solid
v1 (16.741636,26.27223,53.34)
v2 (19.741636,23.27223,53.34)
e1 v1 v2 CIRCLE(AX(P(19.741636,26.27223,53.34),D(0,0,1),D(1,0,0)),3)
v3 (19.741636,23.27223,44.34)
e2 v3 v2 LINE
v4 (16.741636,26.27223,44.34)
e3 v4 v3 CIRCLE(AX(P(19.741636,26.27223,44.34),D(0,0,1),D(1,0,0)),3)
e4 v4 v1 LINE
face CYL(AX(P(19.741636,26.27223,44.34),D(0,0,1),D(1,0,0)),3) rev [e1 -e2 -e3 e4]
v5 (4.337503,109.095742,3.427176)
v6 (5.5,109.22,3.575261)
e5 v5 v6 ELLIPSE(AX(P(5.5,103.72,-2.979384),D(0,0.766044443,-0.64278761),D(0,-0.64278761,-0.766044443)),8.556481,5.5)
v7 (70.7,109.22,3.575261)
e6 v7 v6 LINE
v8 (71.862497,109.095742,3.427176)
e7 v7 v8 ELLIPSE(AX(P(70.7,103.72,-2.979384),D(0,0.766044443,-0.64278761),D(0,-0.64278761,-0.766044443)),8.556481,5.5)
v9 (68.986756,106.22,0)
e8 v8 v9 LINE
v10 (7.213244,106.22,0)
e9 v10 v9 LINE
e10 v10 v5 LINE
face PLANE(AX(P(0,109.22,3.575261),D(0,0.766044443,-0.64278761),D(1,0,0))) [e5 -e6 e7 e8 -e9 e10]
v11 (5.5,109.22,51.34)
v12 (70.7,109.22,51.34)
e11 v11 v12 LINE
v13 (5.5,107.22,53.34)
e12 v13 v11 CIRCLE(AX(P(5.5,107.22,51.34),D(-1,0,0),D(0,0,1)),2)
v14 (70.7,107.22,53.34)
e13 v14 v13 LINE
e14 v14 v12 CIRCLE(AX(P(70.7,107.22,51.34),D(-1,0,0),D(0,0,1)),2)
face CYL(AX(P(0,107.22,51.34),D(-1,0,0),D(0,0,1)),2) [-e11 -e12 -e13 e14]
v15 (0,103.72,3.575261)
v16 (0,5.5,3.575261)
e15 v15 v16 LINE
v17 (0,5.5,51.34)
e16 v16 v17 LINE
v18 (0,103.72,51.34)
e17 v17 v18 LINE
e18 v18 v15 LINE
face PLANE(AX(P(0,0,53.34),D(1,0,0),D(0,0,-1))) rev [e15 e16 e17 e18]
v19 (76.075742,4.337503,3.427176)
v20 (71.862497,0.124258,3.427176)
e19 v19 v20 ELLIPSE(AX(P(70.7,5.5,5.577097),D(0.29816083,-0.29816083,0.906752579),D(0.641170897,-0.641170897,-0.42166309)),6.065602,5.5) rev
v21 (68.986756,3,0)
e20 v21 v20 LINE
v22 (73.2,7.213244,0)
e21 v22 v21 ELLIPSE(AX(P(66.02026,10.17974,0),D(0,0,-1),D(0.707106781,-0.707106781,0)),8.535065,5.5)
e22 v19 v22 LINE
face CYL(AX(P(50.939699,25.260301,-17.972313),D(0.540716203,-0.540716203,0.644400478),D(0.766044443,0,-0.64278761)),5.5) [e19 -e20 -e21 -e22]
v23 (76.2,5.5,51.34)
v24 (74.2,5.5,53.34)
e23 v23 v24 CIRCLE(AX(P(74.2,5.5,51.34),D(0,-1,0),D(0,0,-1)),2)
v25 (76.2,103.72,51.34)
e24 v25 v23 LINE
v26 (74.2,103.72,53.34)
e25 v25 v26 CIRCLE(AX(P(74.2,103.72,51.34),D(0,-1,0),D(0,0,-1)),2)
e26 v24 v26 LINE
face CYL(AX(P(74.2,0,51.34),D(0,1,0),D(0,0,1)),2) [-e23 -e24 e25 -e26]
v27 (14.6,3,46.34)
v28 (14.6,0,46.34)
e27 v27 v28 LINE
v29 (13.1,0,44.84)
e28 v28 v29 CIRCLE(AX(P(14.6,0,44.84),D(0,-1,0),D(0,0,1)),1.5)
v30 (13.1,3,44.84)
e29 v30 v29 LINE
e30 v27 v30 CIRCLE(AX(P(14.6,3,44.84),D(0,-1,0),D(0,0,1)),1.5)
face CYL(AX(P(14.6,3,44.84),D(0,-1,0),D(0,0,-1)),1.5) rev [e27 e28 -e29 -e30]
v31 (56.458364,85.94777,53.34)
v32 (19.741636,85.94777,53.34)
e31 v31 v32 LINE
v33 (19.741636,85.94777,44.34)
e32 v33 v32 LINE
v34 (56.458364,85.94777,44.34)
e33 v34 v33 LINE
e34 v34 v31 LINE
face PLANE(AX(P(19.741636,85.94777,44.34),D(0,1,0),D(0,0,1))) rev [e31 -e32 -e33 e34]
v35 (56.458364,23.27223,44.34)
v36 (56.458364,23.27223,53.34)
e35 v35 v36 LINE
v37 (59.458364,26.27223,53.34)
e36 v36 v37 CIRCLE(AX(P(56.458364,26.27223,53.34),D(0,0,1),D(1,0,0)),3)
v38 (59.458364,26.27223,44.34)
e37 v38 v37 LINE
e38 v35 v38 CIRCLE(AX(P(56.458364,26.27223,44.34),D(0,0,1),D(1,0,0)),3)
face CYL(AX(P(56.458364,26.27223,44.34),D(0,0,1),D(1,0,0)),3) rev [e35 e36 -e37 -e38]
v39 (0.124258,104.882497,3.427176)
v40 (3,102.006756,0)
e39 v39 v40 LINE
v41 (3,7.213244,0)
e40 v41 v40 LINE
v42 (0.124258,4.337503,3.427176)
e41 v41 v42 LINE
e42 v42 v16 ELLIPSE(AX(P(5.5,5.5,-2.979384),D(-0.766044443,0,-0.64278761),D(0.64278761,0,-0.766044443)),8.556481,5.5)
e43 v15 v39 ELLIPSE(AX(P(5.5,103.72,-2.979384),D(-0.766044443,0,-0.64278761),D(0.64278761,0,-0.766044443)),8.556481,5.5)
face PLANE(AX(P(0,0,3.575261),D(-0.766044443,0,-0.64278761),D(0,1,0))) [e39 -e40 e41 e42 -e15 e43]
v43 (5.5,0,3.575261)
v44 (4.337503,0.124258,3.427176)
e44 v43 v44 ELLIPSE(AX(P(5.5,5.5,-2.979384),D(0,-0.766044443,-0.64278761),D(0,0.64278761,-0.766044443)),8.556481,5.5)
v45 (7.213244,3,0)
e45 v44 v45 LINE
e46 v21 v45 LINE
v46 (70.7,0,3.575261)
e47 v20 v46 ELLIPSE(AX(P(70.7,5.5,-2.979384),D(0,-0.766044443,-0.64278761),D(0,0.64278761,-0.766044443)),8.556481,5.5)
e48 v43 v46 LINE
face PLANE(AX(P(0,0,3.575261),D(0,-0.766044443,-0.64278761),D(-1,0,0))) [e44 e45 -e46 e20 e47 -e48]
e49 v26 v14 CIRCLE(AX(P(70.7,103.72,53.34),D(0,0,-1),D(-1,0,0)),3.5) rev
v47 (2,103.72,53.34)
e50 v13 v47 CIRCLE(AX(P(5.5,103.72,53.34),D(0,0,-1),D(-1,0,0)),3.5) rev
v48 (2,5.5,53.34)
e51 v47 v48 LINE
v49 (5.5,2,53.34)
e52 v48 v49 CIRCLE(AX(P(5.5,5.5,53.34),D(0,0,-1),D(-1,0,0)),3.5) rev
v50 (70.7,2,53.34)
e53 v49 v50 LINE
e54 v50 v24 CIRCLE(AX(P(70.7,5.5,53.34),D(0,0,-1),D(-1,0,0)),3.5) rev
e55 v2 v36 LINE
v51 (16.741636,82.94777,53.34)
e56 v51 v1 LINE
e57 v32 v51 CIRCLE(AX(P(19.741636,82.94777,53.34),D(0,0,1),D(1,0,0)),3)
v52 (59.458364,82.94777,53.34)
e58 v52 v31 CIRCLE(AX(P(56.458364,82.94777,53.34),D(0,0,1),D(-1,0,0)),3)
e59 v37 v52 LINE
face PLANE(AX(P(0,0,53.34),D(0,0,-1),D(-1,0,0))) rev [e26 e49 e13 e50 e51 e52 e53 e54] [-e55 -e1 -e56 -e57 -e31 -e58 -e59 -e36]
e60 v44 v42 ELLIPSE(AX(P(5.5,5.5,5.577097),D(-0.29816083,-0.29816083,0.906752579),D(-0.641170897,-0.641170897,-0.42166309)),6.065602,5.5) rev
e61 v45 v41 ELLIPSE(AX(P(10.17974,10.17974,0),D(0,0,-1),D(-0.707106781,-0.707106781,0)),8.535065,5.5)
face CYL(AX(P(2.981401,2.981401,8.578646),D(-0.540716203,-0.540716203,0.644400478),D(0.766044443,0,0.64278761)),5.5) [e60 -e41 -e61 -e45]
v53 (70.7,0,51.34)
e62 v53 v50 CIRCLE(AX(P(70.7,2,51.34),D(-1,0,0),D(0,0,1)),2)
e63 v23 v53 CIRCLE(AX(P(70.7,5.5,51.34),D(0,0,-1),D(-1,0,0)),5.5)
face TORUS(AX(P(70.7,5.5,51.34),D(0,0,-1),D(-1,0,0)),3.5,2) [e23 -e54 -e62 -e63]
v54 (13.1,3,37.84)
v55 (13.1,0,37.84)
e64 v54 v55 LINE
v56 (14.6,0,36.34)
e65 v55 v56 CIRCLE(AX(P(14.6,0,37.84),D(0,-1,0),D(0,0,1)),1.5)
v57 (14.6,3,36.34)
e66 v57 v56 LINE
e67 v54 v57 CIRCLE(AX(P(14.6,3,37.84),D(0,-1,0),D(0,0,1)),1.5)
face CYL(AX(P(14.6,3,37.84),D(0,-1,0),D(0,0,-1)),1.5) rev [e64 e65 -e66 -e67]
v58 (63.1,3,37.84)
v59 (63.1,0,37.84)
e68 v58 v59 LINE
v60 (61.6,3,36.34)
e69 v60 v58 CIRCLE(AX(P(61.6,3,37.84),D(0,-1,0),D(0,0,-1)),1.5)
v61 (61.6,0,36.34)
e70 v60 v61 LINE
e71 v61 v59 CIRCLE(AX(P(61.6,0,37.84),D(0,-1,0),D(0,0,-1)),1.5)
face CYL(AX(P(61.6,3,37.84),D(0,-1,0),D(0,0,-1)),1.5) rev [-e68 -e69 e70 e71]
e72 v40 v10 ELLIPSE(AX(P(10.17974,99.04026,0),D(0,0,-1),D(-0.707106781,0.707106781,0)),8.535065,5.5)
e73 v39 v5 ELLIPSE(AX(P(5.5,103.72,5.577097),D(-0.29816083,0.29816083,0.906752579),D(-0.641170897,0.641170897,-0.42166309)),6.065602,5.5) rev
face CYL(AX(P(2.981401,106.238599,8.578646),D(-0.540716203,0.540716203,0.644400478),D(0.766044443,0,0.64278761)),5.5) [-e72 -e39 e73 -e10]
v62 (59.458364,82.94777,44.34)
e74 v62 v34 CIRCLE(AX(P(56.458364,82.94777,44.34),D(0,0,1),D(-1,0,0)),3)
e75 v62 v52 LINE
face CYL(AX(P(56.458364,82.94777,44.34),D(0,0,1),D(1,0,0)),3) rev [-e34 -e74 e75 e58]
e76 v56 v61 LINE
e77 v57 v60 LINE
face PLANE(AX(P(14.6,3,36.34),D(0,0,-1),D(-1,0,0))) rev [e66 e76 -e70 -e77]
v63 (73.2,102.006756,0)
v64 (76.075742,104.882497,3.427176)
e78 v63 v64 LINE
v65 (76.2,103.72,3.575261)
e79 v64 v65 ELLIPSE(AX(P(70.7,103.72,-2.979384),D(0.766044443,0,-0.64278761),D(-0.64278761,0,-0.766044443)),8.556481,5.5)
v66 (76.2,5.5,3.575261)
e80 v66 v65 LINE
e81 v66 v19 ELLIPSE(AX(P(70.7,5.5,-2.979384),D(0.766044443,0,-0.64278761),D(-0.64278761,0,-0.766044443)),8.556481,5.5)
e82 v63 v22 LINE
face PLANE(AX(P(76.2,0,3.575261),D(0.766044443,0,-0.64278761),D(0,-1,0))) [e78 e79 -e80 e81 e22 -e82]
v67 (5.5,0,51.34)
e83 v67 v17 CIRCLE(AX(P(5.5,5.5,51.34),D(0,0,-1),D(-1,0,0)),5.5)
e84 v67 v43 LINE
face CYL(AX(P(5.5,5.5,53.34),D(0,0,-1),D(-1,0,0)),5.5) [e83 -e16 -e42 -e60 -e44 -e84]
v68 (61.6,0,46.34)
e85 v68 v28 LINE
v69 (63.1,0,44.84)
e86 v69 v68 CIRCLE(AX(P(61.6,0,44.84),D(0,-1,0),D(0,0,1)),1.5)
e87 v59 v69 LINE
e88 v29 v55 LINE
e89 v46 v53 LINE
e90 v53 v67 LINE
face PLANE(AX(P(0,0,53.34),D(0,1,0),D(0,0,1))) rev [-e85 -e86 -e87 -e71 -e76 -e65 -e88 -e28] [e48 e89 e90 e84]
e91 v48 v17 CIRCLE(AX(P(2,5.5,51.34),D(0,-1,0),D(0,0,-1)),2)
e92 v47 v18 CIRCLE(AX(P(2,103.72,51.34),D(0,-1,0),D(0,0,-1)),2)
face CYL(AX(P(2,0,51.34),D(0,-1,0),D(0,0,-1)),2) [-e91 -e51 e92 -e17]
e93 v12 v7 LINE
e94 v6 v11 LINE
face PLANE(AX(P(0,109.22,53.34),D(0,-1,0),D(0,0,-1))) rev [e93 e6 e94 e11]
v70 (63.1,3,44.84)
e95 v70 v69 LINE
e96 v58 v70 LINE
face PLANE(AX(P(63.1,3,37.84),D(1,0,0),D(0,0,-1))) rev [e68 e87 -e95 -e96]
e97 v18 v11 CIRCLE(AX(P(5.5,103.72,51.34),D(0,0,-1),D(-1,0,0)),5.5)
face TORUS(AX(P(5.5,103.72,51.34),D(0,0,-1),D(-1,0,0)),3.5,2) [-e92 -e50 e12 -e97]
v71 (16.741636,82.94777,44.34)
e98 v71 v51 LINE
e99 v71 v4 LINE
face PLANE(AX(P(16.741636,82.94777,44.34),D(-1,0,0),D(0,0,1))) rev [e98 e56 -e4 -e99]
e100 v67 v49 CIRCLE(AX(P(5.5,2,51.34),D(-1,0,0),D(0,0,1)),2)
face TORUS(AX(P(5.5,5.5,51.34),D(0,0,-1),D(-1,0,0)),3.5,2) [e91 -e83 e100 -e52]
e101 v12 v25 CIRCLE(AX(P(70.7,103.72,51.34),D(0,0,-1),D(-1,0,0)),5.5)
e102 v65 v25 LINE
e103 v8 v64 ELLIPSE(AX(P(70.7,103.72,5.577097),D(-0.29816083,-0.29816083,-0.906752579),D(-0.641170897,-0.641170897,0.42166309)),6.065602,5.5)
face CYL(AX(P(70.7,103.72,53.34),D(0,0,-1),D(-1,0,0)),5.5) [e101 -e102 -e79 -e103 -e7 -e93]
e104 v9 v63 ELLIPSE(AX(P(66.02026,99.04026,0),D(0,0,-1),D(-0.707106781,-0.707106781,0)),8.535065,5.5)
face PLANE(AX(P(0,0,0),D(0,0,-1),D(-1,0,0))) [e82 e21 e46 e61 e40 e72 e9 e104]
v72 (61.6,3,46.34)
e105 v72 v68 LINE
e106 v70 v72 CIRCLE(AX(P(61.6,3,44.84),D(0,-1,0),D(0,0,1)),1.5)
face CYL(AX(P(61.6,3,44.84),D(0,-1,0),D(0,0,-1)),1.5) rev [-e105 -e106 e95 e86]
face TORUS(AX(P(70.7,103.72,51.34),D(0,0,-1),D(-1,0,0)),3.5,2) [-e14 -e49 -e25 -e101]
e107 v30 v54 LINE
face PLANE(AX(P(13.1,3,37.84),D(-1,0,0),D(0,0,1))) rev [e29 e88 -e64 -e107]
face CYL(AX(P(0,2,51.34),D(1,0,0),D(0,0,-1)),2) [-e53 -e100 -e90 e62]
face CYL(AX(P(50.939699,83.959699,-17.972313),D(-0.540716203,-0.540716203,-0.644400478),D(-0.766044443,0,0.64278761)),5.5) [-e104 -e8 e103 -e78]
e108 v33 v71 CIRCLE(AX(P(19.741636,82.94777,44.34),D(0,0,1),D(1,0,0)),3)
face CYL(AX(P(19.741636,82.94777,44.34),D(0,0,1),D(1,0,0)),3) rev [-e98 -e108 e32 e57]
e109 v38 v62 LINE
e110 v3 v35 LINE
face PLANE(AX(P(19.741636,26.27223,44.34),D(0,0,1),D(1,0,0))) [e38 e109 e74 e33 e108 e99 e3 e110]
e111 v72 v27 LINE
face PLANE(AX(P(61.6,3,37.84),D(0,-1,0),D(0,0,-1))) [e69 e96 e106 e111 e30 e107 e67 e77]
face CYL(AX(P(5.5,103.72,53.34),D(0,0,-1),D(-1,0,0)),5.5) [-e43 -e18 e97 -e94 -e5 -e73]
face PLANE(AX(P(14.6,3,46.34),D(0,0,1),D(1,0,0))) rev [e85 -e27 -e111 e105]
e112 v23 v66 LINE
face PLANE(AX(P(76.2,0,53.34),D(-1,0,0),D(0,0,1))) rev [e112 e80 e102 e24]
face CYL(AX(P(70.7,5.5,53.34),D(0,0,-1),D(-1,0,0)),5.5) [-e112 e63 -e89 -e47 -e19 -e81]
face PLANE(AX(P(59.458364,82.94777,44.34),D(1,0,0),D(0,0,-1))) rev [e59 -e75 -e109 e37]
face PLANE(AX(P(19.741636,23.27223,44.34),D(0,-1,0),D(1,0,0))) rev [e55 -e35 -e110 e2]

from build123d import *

# Parameters (mm, degrees)
SKETCH2_W           = 76.2
SKETCH2_H           = 109.22
BOSS_EXTRUDE1_DEPTH = 53.34
CHAMFER1_SIZE       = 3
CHAMFER1_SIZE2      = 3.575260778
CHAMFER2_SIZE       = 3
CHAMFER2_SIZE2      = 3.575260778
FILLET2_R           = 5.5
FILLET3_R           = 5.5
FILLET4_R           = 2
CUT_EXTRUDE1_DEPTH  = 9
CUT_EXTRUDE2_DEPTH  = 3


with BuildPart() as part:
    # Sketch2 → Boss-Extrude1 (new body)
    with BuildSketch(Plane.XY):
        with Locations((38.1, 54.61)):
            Rectangle(SKETCH2_W, SKETCH2_H)
    extrude(amount=BOSS_EXTRUDE1_DEPTH)

    # Chamfer1
    chamfer1_edges = [part.edges().sort_by_distance(p)[0] for p in [
        (38.1, 109.22, 0),
    ]]
    chamfer1_side = [part.faces().sort_by_distance(p)[0] for p in [
        (38.1, 54.61, 0),
    ]]
    chamfer(chamfer1_edges, length=CHAMFER1_SIZE, length2=CHAMFER1_SIZE2, reference=chamfer1_side[0])

    # Chamfer2
    chamfer2_edges = [part.edges().sort_by_distance(p)[0] for p in [
        (0, 53.11, 0),
        (38.1, 0, 0),
        (76.2, 53.11, 0),
    ]]
    chamfer2_side = [part.faces().sort_by_distance(p)[0] for p in [
        (38.1, 53.11, 0),
    ]]
    chamfer(chamfer2_edges, length=CHAMFER2_SIZE, length2=CHAMFER2_SIZE2, reference=chamfer2_side[0])

    # Fillet2
    fillet2_edges = [part.edges().sort_by_distance(p)[0] for p in [
        (74.7, 107.72, 1.787630389),
        (1.5, 107.72, 1.787630389),
        (74.7, 1.5, 1.787630389),
        (1.5, 1.5, 1.787630389),
    ]]
    fillet(fillet2_edges, radius=FILLET2_R)

    # Fillet3
    fillet3_edges = [part.edges().sort_by_distance(p)[0] for p in [
        (76.2, 0, 29.139633853),
        (0, 0, 29.139633853),
        (0, 109.22, 29.139633853),
        (76.2, 109.22, 29.139633853),
    ]]
    fillet(fillet3_edges, radius=FILLET3_R - 0.0001)  # a hair under: the kernel refuses the full size

    # Fillet4
    fillet4_edges = [part.edges().sort_by_distance(p)[0] for p in [
        (76.2, 54.61, 53.34),
        (38.1, 0, 53.34),
        (0, 54.61, 53.34),
        (38.1, 109.22, 53.34),
        (74.589116586, 107.609116586, 53.34),
        (1.610883414, 107.609116586, 53.34),
        (1.610883414, 1.610883414, 53.34),
        (74.589116586, 1.610883414, 53.34),
    ]]
    fillet(fillet4_edges, radius=FILLET4_R)

    # Sketch4 → Cut-Extrude1 (cut)
    with BuildSketch(Plane.XY.offset(53.34)):
        with BuildLine():
            Line((19.741636299, 85.947770103), (56.458363701, 85.947770103))
            ThreePointArc((56.458363701, 85.947770103), (58.579684045, 85.069090446), (59.458363701, 82.947770103))
            Line((59.458363701, 82.947770103), (59.458363701, 26.272229897))
            ThreePointArc((59.458363701, 26.272229897), (58.579684045, 24.150909554), (56.458363701, 23.272229897))
            Line((56.458363701, 23.272229897), (19.741636299, 23.272229897))
            ThreePointArc((19.741636299, 23.272229897), (17.620315955, 24.150909554), (16.741636299, 26.272229897))
            Line((16.741636299, 26.272229897), (16.741636299, 82.947770103))
            ThreePointArc((16.741636299, 82.947770103), (17.620315955, 85.069090446), (19.741636299, 85.947770103))
        make_face()
    extrude(amount=-CUT_EXTRUDE1_DEPTH, mode=Mode.SUBTRACT)

    # Sketch5 → Cut-Extrude2 (cut)
    with BuildSketch(Plane.XZ):
        with BuildLine():
            Line((14.6, 36.34), (61.6, 36.34))
            ThreePointArc((61.6, 36.34), (62.660660172, 36.779339828), (63.1, 37.84))
            Line((63.1, 37.84), (63.1, 44.84))
            ThreePointArc((63.1, 44.84), (62.660660172, 45.900660172), (61.6, 46.34))
            Line((61.6, 46.34), (14.6, 46.34))
            ThreePointArc((14.6, 46.34), (13.539339828, 45.900660172), (13.1, 44.84))
            Line((13.1, 44.84), (13.1, 37.84))
            ThreePointArc((13.1, 37.84), (13.539339828, 36.779339828), (14.6, 36.34))
        make_face()
    extrude(amount=-CUT_EXTRUDE2_DEPTH, mode=Mode.SUBTRACT)


solid = part.part
